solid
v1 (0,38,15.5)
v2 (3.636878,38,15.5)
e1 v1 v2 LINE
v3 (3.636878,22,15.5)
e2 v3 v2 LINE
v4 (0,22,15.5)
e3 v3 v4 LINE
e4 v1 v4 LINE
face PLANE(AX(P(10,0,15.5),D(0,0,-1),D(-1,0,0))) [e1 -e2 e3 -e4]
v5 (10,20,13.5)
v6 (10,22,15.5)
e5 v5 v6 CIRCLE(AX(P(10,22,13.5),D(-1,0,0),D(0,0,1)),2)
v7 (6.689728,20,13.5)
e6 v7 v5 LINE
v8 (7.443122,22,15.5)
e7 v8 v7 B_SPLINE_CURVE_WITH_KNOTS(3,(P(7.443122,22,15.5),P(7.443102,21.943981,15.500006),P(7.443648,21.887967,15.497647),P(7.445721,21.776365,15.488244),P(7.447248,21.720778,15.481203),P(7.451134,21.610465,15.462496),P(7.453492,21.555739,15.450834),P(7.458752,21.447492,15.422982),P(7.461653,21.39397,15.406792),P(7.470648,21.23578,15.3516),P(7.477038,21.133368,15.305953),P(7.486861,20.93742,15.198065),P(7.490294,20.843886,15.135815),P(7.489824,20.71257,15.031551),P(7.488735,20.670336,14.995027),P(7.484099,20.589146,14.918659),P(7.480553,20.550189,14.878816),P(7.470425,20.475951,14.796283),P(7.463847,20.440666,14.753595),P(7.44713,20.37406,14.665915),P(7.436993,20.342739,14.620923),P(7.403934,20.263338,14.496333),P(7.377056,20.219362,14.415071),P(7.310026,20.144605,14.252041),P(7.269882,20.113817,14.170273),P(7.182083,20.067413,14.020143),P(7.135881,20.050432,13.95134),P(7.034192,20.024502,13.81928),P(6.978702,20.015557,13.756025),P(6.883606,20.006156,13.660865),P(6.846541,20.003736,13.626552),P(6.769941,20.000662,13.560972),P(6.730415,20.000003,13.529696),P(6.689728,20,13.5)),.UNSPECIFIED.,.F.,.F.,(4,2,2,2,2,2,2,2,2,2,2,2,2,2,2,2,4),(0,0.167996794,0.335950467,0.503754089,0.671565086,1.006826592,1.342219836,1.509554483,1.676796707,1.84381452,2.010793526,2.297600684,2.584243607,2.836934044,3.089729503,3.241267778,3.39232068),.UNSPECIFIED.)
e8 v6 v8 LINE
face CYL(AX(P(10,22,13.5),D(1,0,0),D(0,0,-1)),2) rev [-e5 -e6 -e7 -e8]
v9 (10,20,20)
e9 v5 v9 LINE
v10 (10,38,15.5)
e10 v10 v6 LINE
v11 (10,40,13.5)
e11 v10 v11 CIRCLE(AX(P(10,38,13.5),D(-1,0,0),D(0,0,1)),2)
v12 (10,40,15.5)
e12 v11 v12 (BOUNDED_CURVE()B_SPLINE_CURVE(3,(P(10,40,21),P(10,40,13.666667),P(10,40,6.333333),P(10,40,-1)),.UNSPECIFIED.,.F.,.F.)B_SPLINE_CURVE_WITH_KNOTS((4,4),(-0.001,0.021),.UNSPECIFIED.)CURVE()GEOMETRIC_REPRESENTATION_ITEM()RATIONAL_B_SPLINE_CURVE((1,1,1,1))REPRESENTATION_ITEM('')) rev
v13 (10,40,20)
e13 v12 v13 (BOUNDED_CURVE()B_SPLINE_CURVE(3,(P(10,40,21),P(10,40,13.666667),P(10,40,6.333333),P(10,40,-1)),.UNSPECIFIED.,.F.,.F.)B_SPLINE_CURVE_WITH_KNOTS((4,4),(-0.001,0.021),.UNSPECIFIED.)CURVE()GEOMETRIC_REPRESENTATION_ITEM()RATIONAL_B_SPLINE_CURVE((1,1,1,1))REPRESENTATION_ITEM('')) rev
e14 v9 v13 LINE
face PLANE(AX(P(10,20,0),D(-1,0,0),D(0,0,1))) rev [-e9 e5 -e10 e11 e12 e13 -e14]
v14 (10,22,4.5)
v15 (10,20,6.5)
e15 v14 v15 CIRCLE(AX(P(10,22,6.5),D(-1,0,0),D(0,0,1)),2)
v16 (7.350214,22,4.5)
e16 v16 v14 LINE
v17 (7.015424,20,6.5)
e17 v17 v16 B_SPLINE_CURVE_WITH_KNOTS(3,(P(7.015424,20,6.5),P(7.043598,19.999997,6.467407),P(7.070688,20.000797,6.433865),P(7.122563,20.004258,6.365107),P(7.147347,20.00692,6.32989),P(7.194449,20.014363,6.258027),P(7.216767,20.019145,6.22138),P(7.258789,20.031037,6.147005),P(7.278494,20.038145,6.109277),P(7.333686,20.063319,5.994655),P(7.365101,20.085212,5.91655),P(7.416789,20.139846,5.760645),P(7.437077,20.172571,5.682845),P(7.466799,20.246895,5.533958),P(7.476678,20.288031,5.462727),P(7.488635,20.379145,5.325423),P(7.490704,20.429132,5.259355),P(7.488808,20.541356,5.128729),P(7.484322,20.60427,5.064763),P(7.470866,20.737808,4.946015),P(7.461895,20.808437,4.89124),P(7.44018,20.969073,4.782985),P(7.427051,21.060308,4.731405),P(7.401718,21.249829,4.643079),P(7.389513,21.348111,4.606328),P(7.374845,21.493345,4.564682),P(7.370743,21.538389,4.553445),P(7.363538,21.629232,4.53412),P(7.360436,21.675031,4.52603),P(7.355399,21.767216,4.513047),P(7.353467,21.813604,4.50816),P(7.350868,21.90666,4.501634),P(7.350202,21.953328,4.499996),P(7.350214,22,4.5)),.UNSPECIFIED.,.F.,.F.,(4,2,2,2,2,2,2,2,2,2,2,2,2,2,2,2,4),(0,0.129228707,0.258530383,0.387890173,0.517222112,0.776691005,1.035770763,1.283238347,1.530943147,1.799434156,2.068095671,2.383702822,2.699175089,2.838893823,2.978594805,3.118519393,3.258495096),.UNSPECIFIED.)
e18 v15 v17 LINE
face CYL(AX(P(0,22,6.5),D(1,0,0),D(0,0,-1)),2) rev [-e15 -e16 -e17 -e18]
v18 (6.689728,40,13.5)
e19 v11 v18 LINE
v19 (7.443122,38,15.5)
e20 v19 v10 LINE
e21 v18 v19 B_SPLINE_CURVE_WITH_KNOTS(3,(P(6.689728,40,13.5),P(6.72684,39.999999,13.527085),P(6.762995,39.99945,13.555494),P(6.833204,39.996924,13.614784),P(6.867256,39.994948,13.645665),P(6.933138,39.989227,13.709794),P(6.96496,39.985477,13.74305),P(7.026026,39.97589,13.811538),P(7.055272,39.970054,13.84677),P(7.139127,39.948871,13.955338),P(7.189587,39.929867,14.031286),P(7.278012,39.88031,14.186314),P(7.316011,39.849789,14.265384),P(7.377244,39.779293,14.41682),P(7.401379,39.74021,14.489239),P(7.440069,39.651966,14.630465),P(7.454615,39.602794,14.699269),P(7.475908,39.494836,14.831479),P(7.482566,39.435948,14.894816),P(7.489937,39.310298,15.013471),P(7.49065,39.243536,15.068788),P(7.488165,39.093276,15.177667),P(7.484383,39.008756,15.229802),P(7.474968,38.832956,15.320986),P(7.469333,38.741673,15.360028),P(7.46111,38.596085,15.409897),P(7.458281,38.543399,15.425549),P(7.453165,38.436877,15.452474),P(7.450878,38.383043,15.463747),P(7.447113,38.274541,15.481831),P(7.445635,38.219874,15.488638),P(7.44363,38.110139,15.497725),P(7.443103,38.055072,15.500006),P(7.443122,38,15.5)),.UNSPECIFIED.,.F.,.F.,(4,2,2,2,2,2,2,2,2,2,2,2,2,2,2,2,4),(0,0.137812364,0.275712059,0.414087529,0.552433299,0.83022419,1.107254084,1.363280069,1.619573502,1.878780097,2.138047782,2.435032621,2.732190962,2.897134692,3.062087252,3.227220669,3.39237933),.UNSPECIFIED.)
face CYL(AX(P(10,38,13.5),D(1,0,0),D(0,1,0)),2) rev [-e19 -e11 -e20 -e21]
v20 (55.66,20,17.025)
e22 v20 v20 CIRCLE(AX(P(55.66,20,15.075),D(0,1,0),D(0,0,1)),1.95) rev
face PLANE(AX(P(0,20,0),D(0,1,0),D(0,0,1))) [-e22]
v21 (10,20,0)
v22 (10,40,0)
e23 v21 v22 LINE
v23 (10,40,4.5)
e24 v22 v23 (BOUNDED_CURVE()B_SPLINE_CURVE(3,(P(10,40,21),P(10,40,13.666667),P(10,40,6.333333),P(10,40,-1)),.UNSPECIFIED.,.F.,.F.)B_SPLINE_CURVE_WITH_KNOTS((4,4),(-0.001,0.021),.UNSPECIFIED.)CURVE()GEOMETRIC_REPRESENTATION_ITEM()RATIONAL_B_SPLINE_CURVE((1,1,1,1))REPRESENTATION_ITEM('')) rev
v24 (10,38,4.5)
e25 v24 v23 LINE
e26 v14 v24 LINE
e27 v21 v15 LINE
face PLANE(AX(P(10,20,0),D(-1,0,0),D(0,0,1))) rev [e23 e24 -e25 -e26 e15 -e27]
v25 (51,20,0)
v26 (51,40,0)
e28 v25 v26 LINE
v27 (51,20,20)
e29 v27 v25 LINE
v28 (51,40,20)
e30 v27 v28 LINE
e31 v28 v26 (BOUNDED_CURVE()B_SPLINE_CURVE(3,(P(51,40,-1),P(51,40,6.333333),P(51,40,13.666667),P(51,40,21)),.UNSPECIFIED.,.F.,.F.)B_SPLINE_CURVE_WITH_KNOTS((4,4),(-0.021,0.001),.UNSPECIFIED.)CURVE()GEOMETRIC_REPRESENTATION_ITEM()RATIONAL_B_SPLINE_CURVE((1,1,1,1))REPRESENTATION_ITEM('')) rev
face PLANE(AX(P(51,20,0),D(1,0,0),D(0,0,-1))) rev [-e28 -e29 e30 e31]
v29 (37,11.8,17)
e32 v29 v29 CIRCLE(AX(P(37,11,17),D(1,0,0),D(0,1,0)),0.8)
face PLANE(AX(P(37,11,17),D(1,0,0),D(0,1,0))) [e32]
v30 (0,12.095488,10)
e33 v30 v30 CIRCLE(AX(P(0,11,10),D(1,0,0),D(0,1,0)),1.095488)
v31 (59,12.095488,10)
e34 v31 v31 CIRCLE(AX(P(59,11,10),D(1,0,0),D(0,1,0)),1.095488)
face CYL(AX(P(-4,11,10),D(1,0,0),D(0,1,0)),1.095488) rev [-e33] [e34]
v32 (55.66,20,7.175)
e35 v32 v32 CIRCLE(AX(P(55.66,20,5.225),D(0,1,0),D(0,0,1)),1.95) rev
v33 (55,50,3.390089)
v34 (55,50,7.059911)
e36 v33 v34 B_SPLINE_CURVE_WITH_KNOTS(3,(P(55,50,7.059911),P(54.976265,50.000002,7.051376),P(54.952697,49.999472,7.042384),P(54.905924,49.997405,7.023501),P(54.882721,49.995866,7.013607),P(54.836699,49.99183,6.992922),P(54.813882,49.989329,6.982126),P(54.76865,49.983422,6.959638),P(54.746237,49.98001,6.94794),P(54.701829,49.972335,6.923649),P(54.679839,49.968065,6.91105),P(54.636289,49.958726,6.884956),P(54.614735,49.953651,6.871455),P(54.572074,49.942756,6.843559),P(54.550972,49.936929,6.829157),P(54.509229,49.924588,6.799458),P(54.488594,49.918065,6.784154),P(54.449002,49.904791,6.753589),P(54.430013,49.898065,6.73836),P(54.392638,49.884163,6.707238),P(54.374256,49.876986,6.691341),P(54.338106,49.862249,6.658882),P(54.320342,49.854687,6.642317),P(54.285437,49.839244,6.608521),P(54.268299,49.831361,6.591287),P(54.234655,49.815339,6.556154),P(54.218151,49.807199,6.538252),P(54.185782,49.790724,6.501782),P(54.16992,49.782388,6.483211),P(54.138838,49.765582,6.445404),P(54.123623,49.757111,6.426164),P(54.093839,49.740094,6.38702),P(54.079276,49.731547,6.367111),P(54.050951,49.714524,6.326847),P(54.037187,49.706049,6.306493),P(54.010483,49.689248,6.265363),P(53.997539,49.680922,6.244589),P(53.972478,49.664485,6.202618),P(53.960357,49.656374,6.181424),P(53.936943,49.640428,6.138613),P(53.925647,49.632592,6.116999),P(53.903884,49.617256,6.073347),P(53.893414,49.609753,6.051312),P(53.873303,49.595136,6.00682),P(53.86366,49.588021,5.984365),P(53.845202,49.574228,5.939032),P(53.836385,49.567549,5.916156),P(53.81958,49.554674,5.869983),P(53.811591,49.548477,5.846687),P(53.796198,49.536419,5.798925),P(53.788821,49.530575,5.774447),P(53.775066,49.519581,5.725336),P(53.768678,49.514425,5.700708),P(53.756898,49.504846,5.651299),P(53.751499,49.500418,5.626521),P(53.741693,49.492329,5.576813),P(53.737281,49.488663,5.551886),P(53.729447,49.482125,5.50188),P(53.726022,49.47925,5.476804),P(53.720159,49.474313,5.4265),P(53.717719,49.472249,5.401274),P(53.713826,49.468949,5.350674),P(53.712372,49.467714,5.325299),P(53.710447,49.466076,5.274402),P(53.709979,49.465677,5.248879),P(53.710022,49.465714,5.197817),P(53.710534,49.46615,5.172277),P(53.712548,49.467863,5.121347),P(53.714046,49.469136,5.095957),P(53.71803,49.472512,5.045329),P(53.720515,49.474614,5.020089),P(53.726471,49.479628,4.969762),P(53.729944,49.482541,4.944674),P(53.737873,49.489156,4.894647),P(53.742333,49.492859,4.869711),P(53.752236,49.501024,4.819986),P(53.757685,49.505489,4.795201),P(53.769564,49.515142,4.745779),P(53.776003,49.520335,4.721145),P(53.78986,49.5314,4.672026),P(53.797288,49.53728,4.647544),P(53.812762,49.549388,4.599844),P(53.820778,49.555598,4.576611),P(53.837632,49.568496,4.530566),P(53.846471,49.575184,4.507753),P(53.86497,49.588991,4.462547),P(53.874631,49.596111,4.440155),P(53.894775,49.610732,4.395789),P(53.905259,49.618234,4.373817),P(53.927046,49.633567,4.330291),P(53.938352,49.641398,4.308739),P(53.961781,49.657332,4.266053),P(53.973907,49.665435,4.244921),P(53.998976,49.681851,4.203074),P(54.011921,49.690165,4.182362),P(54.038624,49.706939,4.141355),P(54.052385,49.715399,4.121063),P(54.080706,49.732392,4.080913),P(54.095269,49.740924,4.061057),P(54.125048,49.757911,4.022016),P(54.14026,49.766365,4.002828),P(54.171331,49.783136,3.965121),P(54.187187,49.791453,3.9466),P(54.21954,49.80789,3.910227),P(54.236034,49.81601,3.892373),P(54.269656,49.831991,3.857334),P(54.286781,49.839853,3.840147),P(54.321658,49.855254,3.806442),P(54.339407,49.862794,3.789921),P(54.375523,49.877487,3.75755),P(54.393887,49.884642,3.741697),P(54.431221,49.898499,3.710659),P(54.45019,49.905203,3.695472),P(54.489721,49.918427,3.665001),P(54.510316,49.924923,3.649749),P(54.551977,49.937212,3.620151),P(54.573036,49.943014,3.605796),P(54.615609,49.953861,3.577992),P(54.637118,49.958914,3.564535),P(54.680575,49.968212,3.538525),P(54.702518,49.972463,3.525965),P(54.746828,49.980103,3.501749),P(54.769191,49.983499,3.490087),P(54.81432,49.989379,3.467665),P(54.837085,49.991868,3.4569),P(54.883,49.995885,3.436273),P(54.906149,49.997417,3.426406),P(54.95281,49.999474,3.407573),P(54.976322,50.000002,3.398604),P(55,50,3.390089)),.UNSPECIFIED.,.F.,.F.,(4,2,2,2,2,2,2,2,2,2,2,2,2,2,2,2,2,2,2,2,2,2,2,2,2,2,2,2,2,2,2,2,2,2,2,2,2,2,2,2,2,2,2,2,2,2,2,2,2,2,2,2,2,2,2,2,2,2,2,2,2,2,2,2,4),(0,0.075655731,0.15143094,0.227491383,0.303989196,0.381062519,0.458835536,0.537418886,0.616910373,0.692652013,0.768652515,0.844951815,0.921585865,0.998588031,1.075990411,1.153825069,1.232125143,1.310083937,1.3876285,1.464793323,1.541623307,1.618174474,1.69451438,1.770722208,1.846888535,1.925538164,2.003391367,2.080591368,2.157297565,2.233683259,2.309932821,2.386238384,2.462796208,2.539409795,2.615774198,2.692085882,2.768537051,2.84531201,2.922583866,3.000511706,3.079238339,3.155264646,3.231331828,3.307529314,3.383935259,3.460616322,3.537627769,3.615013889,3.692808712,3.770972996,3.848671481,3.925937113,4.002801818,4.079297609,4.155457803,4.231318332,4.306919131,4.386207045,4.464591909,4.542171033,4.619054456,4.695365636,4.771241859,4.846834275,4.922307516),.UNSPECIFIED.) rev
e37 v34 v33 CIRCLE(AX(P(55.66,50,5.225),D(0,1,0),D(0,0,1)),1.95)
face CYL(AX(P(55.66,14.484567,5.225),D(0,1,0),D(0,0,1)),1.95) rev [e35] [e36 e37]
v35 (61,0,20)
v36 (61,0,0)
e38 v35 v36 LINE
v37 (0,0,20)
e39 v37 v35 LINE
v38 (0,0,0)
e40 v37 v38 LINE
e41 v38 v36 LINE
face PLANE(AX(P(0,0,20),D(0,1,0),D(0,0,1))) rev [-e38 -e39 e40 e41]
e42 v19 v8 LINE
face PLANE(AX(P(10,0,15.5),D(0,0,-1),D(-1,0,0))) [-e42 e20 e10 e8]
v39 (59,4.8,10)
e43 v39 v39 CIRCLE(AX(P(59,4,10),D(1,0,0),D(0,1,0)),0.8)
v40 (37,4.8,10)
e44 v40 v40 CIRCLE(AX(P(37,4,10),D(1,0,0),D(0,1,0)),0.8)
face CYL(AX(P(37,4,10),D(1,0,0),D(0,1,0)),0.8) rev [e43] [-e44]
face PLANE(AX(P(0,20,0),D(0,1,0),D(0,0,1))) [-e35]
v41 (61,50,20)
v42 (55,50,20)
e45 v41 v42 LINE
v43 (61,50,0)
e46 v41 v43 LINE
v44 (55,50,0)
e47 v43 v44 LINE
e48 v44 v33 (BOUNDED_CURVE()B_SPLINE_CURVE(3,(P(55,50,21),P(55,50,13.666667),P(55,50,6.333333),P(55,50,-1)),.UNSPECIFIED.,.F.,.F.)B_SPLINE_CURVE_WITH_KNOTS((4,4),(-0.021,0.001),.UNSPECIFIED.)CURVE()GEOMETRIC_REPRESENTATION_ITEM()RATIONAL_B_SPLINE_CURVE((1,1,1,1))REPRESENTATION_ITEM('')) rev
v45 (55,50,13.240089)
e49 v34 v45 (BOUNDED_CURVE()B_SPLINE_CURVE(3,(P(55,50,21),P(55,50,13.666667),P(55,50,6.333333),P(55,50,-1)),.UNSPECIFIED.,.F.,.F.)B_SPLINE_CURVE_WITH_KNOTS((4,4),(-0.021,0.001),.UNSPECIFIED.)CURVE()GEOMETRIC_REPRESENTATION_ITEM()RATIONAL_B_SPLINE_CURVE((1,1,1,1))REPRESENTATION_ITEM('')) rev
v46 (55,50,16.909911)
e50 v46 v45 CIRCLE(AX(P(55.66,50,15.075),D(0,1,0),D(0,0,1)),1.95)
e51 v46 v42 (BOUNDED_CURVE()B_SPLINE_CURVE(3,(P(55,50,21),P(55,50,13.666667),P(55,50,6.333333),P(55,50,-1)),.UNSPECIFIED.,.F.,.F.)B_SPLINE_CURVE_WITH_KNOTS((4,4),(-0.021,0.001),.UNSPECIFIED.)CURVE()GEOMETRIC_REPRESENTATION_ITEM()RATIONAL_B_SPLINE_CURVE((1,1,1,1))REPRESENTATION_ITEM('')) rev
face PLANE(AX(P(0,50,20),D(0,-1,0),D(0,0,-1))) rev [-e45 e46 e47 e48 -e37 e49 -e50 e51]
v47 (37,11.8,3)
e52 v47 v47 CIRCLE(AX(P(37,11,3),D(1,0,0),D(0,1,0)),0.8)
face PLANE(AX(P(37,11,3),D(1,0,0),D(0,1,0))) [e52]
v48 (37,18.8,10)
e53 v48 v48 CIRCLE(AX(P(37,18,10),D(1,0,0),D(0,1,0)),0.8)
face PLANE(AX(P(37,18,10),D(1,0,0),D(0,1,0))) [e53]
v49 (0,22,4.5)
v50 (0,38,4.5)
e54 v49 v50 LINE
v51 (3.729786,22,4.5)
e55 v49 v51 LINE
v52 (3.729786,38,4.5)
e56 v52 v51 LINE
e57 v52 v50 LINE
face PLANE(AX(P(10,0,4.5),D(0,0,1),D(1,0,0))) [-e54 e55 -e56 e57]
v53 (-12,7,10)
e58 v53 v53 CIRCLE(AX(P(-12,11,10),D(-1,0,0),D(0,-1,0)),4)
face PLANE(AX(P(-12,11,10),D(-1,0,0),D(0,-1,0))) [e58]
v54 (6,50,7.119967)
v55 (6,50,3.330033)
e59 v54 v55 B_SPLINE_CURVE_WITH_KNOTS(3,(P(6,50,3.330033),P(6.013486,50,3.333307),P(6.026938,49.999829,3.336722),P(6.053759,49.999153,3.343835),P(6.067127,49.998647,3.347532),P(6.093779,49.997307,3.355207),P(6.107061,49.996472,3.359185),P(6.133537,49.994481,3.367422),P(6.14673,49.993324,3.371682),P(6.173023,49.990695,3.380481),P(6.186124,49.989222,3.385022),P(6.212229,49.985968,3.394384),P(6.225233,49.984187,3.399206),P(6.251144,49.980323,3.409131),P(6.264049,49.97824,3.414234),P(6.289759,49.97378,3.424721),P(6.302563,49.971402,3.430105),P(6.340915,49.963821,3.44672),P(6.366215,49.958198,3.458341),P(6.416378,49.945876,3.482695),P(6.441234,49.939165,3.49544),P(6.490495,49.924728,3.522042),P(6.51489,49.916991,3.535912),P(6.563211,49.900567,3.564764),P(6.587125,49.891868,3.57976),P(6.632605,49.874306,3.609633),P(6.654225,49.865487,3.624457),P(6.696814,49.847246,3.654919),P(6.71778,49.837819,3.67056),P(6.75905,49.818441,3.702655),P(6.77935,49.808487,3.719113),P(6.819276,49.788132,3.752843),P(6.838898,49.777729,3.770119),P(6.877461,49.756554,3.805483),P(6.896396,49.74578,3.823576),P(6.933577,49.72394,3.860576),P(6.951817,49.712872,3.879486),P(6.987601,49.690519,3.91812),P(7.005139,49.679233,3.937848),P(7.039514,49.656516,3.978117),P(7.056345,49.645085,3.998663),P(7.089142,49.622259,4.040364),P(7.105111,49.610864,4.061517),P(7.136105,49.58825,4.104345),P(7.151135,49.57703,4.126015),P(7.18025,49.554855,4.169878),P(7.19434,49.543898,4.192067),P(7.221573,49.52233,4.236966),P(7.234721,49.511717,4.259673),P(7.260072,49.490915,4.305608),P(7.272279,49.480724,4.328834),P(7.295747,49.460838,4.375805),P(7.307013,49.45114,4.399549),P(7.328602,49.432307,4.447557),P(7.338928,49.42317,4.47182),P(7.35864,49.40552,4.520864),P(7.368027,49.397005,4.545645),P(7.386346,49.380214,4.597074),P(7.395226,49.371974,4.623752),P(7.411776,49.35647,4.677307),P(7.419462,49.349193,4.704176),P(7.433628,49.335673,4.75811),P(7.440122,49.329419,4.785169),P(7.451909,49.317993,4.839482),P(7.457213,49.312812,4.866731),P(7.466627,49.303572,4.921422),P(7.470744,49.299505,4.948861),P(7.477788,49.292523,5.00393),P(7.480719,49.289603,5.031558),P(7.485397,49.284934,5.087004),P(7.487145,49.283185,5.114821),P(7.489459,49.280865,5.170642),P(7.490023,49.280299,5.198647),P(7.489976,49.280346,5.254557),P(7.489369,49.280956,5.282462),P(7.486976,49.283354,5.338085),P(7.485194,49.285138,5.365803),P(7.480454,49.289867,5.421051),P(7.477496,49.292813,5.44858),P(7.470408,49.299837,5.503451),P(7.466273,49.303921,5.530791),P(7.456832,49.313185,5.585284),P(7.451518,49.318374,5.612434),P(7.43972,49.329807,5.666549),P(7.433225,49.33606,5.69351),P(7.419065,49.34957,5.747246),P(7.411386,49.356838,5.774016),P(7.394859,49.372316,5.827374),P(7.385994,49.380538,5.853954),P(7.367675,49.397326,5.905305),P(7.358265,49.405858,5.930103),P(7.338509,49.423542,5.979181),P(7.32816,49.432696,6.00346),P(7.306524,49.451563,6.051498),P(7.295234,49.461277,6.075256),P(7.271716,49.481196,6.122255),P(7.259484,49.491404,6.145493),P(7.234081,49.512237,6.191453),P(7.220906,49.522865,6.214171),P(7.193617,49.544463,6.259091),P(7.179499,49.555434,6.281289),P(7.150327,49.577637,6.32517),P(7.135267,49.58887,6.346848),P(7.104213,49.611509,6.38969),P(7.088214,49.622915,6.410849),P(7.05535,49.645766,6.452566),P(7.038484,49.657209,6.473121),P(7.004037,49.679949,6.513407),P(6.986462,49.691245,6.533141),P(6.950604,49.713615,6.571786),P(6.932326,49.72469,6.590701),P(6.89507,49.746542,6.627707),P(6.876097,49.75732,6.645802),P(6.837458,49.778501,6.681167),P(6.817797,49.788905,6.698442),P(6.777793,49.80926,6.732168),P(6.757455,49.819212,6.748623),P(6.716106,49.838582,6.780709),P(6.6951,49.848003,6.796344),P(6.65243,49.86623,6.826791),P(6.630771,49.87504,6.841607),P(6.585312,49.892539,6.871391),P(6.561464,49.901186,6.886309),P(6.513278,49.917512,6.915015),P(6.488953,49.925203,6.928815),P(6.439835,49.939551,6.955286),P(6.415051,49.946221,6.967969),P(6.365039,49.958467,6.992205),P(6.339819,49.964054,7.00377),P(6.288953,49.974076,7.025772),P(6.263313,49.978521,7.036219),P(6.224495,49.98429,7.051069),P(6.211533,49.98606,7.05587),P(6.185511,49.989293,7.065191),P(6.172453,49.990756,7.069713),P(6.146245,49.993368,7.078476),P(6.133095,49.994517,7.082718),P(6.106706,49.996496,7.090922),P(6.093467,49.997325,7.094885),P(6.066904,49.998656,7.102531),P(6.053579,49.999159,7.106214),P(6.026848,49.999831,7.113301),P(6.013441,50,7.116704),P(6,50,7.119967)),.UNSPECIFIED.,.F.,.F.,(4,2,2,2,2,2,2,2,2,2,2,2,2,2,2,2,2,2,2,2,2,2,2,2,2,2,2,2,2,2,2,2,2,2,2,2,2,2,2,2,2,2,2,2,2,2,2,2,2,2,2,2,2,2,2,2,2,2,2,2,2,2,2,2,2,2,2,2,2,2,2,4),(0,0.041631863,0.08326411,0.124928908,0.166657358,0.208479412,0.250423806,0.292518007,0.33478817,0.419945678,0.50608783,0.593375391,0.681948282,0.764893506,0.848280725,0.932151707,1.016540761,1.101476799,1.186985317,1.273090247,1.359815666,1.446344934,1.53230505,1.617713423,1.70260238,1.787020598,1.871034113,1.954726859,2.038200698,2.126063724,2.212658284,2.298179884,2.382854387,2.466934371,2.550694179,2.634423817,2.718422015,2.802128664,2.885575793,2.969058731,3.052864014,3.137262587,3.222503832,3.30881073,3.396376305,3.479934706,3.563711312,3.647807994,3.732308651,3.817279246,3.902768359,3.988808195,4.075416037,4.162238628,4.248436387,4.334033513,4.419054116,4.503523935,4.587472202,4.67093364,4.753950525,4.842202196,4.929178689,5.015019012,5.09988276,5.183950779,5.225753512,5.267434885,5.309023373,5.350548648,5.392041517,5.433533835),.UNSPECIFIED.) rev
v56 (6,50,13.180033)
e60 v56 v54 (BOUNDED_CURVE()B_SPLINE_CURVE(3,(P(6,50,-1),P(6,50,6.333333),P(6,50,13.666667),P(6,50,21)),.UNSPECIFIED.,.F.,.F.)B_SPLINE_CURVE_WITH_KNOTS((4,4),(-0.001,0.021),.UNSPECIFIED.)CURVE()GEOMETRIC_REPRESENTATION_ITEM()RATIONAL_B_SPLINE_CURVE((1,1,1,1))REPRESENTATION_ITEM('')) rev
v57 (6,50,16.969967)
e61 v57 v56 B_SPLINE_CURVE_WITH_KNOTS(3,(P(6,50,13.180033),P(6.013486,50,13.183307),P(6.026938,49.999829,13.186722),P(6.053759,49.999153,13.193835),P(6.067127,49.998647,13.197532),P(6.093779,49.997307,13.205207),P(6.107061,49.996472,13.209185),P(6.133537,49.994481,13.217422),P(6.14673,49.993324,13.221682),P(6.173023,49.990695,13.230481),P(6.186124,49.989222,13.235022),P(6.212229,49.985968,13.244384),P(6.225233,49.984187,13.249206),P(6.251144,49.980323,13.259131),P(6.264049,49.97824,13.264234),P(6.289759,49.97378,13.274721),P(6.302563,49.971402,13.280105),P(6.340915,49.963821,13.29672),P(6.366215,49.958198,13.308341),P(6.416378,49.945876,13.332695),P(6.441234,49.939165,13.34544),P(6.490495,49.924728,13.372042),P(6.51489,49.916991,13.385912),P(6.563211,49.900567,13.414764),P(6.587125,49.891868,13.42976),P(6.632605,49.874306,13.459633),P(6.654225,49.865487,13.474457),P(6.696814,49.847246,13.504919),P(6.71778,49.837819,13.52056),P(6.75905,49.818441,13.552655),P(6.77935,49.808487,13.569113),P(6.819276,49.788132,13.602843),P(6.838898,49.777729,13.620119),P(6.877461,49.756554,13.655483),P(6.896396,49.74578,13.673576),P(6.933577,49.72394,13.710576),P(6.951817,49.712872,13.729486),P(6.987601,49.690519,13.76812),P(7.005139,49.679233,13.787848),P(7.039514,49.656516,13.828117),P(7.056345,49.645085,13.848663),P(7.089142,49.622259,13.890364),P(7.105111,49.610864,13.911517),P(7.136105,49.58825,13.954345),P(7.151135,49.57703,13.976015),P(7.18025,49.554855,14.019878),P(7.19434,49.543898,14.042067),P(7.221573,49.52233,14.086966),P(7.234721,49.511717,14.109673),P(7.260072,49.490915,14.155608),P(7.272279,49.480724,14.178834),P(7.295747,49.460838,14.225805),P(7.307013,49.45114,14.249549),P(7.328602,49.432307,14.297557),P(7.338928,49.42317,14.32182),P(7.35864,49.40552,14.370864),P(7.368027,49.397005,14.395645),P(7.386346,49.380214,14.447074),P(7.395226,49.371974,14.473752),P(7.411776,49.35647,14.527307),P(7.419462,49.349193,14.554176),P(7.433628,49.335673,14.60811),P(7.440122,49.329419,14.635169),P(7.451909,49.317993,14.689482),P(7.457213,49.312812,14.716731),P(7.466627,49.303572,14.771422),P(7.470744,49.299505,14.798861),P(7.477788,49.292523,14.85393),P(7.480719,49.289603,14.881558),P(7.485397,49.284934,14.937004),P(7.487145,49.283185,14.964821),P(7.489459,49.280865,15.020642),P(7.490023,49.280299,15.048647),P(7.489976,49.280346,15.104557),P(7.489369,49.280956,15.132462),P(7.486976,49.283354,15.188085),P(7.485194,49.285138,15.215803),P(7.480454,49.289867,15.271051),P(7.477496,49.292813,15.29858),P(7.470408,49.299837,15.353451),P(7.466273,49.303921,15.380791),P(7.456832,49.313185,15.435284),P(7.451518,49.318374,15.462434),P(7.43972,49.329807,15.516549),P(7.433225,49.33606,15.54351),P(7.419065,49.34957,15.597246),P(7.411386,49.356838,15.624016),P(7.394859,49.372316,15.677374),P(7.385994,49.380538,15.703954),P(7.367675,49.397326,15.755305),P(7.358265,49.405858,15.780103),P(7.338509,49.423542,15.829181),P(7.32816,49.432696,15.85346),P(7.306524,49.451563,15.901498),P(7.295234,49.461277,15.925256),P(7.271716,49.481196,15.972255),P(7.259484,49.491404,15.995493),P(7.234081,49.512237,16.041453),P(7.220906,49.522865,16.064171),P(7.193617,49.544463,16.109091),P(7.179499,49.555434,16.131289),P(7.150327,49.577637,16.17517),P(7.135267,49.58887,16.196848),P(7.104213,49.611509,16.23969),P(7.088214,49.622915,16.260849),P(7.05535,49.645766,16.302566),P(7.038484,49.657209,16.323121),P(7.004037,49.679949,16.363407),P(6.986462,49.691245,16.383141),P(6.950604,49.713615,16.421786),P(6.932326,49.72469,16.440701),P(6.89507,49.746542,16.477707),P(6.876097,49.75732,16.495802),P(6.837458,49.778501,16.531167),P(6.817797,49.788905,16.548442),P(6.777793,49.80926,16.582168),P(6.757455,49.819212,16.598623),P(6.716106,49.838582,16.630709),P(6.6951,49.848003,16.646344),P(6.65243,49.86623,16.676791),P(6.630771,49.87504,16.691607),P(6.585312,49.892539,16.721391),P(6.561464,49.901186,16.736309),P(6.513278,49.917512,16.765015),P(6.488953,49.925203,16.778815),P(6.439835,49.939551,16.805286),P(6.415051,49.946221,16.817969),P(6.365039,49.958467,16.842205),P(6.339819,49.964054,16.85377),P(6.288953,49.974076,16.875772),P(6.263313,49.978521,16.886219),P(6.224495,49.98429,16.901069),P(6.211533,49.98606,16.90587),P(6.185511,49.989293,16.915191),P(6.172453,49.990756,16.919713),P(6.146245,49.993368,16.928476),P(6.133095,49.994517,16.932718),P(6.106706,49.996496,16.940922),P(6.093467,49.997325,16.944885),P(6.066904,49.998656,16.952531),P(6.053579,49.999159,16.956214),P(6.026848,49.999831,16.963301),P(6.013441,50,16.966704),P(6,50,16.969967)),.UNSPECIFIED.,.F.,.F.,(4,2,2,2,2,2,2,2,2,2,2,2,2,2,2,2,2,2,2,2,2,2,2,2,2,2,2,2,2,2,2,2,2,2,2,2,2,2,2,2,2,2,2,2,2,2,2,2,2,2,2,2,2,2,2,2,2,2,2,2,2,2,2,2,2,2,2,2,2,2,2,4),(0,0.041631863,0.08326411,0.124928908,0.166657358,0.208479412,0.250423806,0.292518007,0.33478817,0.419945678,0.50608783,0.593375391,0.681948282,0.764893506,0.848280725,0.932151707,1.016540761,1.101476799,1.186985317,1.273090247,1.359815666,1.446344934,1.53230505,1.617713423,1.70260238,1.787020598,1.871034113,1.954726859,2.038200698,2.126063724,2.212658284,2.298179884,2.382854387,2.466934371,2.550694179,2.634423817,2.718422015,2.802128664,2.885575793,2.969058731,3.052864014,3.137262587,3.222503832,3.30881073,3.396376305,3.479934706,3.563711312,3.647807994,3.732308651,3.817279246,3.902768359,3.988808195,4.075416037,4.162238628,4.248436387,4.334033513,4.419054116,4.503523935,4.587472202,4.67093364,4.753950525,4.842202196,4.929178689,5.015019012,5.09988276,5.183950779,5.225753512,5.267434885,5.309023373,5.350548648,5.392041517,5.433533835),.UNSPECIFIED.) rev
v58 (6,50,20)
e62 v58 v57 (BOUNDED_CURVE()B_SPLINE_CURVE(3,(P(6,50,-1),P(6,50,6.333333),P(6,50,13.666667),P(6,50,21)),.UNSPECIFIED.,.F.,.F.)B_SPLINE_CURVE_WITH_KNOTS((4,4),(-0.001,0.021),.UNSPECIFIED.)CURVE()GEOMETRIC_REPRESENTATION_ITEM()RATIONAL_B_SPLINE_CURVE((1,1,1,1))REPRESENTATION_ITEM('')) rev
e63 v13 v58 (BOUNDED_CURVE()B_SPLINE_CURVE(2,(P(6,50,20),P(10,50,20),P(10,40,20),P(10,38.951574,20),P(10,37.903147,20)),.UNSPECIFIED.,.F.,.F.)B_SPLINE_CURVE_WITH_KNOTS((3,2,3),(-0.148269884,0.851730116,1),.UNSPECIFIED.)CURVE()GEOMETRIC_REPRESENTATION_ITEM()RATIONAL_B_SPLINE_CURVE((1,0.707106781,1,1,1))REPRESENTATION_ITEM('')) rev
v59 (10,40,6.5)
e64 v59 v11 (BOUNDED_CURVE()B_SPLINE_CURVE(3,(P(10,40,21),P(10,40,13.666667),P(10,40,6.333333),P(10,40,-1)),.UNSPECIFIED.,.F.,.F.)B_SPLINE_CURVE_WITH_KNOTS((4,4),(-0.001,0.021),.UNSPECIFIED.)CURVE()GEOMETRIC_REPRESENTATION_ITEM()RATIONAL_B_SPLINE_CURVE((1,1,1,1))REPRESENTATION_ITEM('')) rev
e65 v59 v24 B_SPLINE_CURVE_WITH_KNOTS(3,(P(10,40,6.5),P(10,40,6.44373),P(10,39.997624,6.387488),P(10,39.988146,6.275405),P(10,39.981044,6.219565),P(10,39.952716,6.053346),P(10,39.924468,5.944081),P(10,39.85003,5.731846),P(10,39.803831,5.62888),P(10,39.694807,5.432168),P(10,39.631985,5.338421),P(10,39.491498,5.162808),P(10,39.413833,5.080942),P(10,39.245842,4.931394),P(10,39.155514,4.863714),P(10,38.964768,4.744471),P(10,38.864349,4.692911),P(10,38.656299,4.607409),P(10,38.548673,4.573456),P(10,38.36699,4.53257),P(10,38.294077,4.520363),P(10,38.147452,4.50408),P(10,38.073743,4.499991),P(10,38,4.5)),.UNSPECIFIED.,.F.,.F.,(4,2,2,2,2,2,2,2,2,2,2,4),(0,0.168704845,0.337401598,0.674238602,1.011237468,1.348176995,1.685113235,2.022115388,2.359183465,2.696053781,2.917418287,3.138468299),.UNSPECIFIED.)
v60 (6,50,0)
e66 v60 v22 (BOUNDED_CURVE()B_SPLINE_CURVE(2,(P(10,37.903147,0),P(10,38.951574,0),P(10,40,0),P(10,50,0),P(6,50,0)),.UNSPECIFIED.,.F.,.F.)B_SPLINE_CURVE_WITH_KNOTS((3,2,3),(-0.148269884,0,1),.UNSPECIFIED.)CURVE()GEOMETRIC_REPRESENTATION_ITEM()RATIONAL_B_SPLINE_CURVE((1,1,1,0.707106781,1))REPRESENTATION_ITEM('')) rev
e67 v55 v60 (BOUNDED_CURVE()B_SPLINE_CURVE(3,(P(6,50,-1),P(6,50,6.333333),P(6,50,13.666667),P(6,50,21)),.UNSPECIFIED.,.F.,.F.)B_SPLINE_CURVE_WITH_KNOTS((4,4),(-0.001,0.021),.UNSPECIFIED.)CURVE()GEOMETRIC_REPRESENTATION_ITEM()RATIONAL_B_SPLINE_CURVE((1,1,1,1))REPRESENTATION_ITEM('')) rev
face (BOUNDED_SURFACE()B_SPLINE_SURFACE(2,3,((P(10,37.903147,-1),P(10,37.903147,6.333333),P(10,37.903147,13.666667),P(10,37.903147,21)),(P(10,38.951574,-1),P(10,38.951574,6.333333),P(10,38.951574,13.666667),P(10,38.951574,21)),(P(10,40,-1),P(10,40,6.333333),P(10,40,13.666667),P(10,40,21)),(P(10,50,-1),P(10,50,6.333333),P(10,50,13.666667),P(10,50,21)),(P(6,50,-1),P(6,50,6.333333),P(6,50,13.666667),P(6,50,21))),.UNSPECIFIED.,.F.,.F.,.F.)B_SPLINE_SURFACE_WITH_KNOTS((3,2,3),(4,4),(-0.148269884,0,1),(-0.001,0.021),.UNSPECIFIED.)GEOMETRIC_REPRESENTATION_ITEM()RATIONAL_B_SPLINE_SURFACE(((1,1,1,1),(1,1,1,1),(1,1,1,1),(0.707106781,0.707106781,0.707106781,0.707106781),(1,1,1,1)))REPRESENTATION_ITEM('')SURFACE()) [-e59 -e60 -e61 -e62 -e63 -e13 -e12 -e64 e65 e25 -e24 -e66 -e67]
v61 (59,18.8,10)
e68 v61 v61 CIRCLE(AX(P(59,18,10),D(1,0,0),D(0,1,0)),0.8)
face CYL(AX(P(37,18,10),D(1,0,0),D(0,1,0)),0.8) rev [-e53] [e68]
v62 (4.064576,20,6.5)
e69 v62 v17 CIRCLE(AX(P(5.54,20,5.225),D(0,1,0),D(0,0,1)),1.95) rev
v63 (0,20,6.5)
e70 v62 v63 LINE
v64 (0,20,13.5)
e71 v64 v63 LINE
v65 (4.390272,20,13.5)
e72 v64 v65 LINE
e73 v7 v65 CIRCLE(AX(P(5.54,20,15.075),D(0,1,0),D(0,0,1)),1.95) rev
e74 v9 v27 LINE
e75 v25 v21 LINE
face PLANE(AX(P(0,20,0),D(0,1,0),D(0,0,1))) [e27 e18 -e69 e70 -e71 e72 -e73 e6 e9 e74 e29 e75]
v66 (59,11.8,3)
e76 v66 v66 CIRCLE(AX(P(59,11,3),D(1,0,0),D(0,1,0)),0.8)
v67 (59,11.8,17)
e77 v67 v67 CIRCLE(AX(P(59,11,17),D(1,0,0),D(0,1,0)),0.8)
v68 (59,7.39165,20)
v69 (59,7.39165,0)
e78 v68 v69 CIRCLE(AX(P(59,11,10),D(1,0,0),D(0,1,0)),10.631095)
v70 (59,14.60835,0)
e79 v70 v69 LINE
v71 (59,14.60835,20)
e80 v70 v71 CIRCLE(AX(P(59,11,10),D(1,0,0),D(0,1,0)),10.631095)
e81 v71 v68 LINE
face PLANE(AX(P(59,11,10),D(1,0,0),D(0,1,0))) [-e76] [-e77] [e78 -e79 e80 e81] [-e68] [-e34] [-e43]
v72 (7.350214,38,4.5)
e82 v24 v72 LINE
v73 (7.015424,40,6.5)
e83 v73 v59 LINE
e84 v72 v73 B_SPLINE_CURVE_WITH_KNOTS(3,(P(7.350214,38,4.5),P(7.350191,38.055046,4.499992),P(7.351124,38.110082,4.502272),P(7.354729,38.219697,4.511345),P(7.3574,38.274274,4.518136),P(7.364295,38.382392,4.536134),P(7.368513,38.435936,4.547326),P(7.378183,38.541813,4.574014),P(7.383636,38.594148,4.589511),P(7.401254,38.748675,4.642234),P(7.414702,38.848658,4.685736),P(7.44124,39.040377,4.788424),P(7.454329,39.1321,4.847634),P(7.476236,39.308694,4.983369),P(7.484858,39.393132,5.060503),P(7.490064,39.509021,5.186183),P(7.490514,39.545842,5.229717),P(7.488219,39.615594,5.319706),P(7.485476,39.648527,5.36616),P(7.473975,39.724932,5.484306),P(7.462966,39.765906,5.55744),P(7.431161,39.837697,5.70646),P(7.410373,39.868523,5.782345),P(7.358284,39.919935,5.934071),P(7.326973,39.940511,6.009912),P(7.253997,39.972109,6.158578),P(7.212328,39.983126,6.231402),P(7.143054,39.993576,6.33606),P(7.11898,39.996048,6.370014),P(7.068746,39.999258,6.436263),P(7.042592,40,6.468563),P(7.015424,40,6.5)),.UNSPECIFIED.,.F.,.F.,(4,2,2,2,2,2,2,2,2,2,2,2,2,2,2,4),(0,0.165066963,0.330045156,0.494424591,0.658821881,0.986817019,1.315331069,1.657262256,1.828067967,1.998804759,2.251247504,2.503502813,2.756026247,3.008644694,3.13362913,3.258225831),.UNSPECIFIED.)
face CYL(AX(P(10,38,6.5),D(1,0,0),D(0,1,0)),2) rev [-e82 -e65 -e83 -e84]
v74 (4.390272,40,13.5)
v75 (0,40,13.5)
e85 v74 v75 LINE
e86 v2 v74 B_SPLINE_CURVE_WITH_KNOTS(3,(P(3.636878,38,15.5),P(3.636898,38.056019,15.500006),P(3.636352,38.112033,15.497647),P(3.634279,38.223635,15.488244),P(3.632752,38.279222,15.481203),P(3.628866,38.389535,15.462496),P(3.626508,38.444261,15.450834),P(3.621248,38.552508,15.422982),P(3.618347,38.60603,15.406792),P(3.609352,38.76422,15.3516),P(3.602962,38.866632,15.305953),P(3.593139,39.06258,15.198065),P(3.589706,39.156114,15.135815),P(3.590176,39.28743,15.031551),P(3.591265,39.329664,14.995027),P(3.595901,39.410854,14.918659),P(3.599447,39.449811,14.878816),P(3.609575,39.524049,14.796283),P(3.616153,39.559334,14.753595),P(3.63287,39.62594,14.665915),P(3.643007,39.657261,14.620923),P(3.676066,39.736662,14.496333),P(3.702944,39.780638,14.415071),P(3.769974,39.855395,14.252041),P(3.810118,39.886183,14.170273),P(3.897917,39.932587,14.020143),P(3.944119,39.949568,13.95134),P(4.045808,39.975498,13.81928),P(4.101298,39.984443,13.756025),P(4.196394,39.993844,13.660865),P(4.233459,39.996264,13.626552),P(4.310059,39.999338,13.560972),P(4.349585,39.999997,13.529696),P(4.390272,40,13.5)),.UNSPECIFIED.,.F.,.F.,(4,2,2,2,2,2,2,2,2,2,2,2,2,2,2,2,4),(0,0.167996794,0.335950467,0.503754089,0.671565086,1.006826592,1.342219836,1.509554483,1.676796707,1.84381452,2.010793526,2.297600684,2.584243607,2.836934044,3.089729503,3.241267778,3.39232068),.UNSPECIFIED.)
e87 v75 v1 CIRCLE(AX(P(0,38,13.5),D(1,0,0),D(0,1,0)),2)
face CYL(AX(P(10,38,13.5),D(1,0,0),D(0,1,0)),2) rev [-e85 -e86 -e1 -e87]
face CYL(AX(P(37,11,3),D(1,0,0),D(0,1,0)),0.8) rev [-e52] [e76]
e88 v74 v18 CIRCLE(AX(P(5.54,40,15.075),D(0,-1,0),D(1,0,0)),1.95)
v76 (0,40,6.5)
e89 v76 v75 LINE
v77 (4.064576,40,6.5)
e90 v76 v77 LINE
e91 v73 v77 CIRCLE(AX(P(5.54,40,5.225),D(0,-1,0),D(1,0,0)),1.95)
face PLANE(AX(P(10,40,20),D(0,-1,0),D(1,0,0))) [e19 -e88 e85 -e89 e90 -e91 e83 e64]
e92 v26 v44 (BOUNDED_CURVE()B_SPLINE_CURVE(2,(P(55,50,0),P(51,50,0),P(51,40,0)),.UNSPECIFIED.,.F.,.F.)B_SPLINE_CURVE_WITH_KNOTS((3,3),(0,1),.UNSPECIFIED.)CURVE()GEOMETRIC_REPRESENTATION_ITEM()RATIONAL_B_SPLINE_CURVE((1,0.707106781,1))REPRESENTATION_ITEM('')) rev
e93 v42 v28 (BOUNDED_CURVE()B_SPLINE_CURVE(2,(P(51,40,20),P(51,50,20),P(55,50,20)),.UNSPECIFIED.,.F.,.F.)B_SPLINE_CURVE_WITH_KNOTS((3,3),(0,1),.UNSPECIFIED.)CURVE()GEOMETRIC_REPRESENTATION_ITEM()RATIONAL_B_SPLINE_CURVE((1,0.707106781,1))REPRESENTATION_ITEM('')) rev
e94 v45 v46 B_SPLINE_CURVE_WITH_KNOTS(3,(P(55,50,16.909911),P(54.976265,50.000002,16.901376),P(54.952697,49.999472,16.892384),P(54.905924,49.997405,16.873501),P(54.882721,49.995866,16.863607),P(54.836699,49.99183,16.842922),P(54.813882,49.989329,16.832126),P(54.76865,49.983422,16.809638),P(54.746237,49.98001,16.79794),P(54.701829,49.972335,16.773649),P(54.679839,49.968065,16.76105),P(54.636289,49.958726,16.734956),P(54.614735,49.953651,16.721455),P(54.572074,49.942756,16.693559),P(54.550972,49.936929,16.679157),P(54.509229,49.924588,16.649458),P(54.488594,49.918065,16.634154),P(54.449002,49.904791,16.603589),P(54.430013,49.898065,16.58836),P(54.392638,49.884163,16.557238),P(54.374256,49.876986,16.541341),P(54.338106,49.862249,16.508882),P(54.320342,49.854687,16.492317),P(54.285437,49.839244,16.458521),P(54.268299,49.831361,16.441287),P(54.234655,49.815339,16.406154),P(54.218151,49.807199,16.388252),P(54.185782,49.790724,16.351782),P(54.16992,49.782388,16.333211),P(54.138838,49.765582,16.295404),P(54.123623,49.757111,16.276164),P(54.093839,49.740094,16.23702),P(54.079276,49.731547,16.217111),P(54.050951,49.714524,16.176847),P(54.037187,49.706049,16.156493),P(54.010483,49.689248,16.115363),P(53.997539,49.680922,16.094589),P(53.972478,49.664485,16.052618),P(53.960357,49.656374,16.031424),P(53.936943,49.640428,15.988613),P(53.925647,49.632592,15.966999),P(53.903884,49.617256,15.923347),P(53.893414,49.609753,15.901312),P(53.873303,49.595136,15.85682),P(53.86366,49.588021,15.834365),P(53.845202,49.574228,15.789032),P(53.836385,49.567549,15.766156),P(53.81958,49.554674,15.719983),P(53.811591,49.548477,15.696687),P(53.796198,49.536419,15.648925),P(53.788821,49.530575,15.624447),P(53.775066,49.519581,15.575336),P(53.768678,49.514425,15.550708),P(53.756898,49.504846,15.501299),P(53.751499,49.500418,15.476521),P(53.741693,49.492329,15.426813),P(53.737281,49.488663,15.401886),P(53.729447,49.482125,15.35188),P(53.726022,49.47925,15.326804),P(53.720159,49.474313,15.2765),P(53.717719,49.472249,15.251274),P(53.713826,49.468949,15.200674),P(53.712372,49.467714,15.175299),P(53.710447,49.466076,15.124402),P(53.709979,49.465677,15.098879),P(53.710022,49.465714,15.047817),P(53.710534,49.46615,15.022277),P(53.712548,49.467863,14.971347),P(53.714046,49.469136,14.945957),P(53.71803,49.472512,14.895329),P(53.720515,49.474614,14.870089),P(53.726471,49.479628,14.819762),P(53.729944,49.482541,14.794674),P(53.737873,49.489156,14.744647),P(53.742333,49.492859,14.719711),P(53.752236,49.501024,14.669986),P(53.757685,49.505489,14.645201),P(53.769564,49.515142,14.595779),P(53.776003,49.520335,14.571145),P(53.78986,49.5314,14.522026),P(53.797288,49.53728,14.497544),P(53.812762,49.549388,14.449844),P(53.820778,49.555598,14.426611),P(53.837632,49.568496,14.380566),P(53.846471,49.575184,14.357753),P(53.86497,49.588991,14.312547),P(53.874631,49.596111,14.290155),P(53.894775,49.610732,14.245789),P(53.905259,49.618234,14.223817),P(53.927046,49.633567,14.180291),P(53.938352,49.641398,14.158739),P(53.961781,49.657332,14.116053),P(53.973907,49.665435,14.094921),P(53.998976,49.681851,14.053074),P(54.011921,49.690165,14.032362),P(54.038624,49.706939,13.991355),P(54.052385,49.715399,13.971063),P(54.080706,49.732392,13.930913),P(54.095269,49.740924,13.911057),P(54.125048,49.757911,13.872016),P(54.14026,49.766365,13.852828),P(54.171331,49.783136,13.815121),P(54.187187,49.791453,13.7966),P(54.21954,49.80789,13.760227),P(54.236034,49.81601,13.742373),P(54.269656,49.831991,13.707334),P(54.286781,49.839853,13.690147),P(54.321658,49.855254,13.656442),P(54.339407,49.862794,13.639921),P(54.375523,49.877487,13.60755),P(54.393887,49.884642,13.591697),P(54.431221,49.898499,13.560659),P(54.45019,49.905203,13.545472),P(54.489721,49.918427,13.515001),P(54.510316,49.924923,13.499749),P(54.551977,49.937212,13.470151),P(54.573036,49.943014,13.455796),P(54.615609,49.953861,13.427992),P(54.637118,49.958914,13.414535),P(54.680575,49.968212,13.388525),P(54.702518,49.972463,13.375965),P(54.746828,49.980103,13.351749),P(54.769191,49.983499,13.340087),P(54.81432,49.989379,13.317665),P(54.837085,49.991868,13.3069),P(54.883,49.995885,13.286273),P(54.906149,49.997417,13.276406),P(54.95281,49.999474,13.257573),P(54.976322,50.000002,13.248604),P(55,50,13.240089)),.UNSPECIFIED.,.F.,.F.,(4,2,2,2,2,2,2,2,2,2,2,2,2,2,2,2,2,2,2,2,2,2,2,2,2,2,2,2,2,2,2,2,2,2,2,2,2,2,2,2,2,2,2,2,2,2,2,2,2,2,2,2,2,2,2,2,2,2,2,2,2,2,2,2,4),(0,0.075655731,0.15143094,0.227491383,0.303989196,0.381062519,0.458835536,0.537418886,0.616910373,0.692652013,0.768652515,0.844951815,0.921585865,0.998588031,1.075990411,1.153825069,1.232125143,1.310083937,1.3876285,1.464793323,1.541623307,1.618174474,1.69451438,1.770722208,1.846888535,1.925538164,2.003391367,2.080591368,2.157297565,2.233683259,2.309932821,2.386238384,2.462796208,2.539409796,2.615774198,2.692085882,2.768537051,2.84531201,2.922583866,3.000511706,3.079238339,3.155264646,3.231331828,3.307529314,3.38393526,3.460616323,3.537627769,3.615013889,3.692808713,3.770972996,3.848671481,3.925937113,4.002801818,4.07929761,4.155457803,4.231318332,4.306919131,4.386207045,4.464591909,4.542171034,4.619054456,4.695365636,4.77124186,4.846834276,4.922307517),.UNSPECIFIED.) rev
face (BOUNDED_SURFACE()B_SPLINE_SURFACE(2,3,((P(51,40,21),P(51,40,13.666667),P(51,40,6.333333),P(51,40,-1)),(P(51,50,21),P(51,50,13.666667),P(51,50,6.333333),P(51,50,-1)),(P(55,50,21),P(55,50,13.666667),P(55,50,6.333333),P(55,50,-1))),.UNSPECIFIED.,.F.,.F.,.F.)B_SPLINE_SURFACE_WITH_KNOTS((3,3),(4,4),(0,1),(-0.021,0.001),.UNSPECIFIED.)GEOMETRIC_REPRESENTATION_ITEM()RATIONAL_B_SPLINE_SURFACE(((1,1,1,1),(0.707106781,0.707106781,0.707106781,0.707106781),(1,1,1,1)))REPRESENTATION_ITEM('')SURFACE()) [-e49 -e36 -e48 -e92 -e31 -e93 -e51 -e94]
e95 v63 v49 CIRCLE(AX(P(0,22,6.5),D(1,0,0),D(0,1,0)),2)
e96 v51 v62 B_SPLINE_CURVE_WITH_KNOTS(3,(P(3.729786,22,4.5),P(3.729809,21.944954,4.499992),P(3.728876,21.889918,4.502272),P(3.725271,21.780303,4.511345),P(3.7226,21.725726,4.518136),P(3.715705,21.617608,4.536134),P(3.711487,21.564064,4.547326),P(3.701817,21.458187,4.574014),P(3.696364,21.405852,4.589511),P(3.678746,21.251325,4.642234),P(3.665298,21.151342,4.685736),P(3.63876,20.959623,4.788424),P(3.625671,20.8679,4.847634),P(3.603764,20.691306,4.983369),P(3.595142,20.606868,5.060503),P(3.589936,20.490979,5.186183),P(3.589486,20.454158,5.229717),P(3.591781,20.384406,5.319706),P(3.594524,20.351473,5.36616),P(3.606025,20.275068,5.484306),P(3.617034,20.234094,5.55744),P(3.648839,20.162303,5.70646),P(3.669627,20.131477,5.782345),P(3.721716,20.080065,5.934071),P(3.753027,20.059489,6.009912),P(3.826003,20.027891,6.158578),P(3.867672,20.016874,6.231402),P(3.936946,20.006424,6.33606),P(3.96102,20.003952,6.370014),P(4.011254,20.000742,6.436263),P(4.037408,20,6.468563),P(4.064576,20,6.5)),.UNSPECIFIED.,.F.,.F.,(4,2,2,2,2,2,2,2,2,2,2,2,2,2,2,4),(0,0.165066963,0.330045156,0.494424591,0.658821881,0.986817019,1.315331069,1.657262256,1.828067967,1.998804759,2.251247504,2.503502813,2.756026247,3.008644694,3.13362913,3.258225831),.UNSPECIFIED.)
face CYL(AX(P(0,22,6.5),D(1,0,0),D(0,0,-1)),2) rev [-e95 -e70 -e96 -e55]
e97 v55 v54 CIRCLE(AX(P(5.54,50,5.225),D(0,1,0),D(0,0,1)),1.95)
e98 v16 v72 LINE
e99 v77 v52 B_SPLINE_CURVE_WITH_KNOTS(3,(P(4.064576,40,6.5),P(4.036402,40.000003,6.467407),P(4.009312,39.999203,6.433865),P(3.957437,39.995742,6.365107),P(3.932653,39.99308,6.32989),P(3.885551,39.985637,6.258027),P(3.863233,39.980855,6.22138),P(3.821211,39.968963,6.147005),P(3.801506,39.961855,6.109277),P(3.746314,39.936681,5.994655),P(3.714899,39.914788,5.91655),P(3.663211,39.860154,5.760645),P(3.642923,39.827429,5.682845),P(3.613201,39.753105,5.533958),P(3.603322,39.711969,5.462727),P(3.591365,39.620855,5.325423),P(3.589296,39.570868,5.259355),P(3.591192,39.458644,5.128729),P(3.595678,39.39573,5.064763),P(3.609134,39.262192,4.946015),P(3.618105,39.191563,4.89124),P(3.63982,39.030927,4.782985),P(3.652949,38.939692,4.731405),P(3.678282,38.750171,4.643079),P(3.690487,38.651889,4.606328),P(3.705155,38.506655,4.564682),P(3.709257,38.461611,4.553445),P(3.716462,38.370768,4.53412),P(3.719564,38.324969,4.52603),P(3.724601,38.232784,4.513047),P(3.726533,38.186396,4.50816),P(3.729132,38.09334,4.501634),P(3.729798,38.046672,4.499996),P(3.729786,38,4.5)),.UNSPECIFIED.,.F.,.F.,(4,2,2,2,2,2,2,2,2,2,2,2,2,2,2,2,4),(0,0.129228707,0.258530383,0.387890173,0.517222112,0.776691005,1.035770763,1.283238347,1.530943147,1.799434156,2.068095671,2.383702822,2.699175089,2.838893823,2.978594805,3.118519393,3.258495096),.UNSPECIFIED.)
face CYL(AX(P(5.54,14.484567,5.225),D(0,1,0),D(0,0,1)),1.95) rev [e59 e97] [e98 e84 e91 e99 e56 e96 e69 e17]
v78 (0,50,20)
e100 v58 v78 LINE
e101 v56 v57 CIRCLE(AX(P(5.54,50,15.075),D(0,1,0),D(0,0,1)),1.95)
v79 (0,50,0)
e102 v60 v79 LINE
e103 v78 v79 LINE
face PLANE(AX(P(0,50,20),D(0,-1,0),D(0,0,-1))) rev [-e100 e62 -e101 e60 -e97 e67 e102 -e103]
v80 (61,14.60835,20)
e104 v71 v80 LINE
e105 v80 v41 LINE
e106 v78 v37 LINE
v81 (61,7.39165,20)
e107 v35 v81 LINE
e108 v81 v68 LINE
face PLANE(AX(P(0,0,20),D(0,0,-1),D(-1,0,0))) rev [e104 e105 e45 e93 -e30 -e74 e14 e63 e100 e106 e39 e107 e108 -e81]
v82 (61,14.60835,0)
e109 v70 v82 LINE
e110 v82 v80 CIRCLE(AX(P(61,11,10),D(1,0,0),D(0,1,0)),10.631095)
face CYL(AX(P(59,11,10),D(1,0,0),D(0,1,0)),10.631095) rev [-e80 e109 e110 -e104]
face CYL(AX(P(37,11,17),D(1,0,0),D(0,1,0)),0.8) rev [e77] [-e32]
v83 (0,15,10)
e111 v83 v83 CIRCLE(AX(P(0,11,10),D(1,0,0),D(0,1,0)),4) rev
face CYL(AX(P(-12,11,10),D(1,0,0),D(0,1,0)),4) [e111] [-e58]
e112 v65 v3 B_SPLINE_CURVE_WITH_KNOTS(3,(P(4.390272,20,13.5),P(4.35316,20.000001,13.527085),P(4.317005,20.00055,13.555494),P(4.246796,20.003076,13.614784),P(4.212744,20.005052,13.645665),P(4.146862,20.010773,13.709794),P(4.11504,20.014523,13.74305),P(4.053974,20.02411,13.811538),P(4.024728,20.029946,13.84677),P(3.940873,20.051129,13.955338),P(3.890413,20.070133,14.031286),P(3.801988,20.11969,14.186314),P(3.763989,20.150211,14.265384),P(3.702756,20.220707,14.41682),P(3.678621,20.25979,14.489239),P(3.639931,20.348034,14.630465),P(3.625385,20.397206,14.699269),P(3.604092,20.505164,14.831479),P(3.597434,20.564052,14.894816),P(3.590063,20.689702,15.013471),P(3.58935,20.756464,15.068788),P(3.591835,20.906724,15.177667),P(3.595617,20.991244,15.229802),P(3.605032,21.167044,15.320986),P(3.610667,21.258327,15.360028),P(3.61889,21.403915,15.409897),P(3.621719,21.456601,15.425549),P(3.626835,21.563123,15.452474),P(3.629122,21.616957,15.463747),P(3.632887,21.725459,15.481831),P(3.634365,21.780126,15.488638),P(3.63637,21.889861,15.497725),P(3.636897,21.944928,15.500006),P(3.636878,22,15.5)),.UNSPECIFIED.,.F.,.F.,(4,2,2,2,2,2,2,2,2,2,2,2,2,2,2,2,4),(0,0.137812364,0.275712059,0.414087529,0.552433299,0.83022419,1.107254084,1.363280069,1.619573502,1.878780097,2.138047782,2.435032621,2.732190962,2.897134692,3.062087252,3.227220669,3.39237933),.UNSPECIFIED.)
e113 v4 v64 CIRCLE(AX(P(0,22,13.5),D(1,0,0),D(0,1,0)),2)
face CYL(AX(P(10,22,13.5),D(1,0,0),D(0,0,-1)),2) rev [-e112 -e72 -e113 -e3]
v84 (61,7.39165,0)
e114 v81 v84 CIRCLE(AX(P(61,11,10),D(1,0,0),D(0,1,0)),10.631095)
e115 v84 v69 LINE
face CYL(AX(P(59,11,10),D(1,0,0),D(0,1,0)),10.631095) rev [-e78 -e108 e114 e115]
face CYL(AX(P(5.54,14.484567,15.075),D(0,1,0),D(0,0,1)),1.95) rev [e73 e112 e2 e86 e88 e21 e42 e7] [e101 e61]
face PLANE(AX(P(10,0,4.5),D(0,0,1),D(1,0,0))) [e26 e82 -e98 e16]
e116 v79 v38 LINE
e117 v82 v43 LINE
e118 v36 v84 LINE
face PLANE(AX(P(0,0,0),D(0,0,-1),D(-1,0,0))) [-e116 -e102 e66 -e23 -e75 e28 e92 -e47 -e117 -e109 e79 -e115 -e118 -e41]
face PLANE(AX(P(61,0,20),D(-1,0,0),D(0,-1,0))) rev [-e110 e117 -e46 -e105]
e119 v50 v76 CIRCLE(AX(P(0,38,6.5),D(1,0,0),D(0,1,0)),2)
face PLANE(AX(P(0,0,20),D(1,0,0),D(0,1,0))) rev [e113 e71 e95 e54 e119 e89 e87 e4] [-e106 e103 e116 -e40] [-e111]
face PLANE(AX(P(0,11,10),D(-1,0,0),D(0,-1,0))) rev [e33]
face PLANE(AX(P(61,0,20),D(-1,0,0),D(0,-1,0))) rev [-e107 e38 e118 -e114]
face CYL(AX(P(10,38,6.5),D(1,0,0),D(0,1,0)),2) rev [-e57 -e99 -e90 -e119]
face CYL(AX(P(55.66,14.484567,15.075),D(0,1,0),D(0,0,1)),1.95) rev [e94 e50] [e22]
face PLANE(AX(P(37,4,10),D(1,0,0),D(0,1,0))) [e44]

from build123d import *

# Parameters (mm, degrees)
SKIZZE1_W                       = 61
SKIZZE1_H                       = 50
AUFSATZ_LINEAR_AUSTRAGEN1_DEPTH = 20
SKIZZE2_W                       = 41
SKIZZE2_H                       = 20
SCHNITT_LINEAR_AUSTRAGEN1_DEPTH = 30
SCHNITT_LINEAR_START            = -61
SKIZZE3_W                       = 11
SKIZZE3_H                       = 20
SCHNITT_LINEAR_AUSTRAGEN2_DEPTH = 10
SCHNITT_LINEAR_AUSTRAGEN3_REACH = 83.37
SKIZZE4_R                       = 1.95
VERRUNDUNG1_SIZE                = 4
VERRUNDUNG1_SIZE_2              = 10
VERRUNDUNG2_R                   = 2
SKIZZE6_R                       = 10.631095309
SCHNITT_LINEAR_AUSTRAGEN4_DEPTH = 2
SKIZZE7_R                       = 0.8
SCHNITT_LINEAR_AUSTRAGEN5_DEPTH = 22
SKIZZE10_R                      = 1.095488433
SCHNITT_LINEAR_AUSTRAGEN6_DEPTH = 63
SKIZZE11_R                      = 4
AUFSATZ_LINEAR_AUSTRAGEN3_DEPTH = 12


with BuildPart() as part:
    # Skizze1 → Aufsatz-Linear austragen1 (new body)
    with BuildSketch(Plane.XY):
        with Locations((30.5, 25)):
            Rectangle(SKIZZE1_W, SKIZZE1_H)
    extrude(amount=AUFSATZ_LINEAR_AUSTRAGEN1_DEPTH)

    # Skizze2 → Schnitt-Linear austragen1 (cut)
    with BuildSketch(Plane(origin=(0, 50, 0), x_dir=(1, 0, 0), z_dir=(0, 1, 0))):
        with Locations((30.5, -10)):
            Rectangle(SKIZZE2_W, SKIZZE2_H)
    extrude(amount=-SCHNITT_LINEAR_AUSTRAGEN1_DEPTH, mode=Mode.SUBTRACT)

    # Skizze3 → Schnitt-Linear austragen2 (cut)
    with BuildSketch(Plane(origin=(61, 0, 0), x_dir=(0, 0, -1), z_dir=(1, 0, 0)).offset(SCHNITT_LINEAR_START)):
        with Locations((-10, 30)):
            Rectangle(SKIZZE3_W, SKIZZE3_H)
    extrude(amount=SCHNITT_LINEAR_AUSTRAGEN2_DEPTH, mode=Mode.SUBTRACT)

    # Schnitt-Linear austragen3: up to this face of the body (flat: up to its plane)
    schnitt_linear_austragen3_end = Plane(part.part.faces().sort_by_distance((27.483870968, 20, 10))[0])
    # Skizze4 → Schnitt-Linear austragen3 (cut, up to the picked face)
    with BuildSketch(Plane(origin=(0, 50, 0), x_dir=(1, 0, 0), z_dir=(0, 1, 0)), mode=Mode.PRIVATE) as schnitt_linear_austragen3_sk1:
        with Locations(Location((5.54, -5.225, 0), (0, 0, 270))):
            Circle(SKIZZE4_R)
    schnitt_linear_austragen3_tool1 = split(extrude(schnitt_linear_austragen3_sk1.sketch, amount=-SCHNITT_LINEAR_AUSTRAGEN3_REACH, mode=Mode.PRIVATE), bisect_by=schnitt_linear_austragen3_end, keep=Keep.BOTH, mode=Mode.PRIVATE)
    # Skizze4 → Schnitt-Linear austragen3 (cut, up to the picked face)
    with BuildSketch(Plane(origin=(0, 50, 0), x_dir=(1, 0, 0), z_dir=(0, 1, 0)), mode=Mode.PRIVATE) as schnitt_linear_austragen3_sk2:
        with Locations(Location((5.54, -15.075, 0), (0, 0, 270))):
            Circle(SKIZZE4_R)
    schnitt_linear_austragen3_tool2 = split(extrude(schnitt_linear_austragen3_sk2.sketch, amount=-SCHNITT_LINEAR_AUSTRAGEN3_REACH, mode=Mode.PRIVATE), bisect_by=schnitt_linear_austragen3_end, keep=Keep.BOTH, mode=Mode.PRIVATE)
    # Skizze4 → Schnitt-Linear austragen3 (cut, up to the picked face)
    with BuildSketch(Plane(origin=(0, 50, 0), x_dir=(1, 0, 0), z_dir=(0, 1, 0)), mode=Mode.PRIVATE) as schnitt_linear_austragen3_sk3:
        with Locations(Location((55.66, -15.075, 0), (0, 0, 270))):
            Circle(SKIZZE4_R)
    schnitt_linear_austragen3_tool3 = split(extrude(schnitt_linear_austragen3_sk3.sketch, amount=-SCHNITT_LINEAR_AUSTRAGEN3_REACH, mode=Mode.PRIVATE), bisect_by=schnitt_linear_austragen3_end, keep=Keep.BOTH, mode=Mode.PRIVATE)
    # Skizze4 → Schnitt-Linear austragen3 (cut, up to the picked face)
    with BuildSketch(Plane(origin=(0, 50, 0), x_dir=(1, 0, 0), z_dir=(0, 1, 0)), mode=Mode.PRIVATE) as schnitt_linear_austragen3_sk4:
        with Locations(Location((55.66, -5.225, 0), (0, 0, 270))):
            Circle(SKIZZE4_R)
    schnitt_linear_austragen3_tool4 = split(extrude(schnitt_linear_austragen3_sk4.sketch, amount=-SCHNITT_LINEAR_AUSTRAGEN3_REACH, mode=Mode.PRIVATE), bisect_by=schnitt_linear_austragen3_end, keep=Keep.BOTH, mode=Mode.PRIVATE)
    add(schnitt_linear_austragen3_tool1.solids().sort_by(Axis((5.54, 50, 5.225), (0, -1, 0)))[0], mode=Mode.SUBTRACT)
    add(schnitt_linear_austragen3_tool2.solids().sort_by(Axis((5.54, 50, 15.075), (0, -1, 0)))[0], mode=Mode.SUBTRACT)
    add(schnitt_linear_austragen3_tool3.solids().sort_by(Axis((55.66, 50, 15.075), (0, -1, 0)))[0], mode=Mode.SUBTRACT)
    add(schnitt_linear_austragen3_tool4.solids().sort_by(Axis((55.66, 50, 5.225), (0, -1, 0)))[0], mode=Mode.SUBTRACT)

    # Verrundung1
    # an asymmetric fillet: 10, 4 mm, written as the material it takes off along each edge
    with BuildSketch(Plane(origin=(51, 50, -25), x_dir=(1, 0, 0), z_dir=(0, 0, 1)), Plane(origin=(10, 50, 45), x_dir=(-1, 0, 0), z_dir=(0, 0, -1))) as verrundung1_piece_1:
        with BuildLine():
            Bezier((VERRUNDUNG1_SIZE, 0), (0, 0), (0, -VERRUNDUNG1_SIZE_2), weights=[1, 0.707106781, 1])
            Line((0, -VERRUNDUNG1_SIZE_2), (0, 0))
            Line((0, 0), (VERRUNDUNG1_SIZE, 0))
        make_face()
    extrude(amount=70, mode=Mode.SUBTRACT)

    # Verrundung2
    verrundung2_edges = [part.edges().sort_by_distance(p)[0] for p in [
        (1.818438783, 40, 15.5),
        (8.721561217, 40, 15.5),
        (8.675107038, 40, 4.5),
        (1.864892962, 40, 4.5),
        (8.721561217, 20, 15.5),
        (1.818438783, 20, 15.5),
        (8.675107038, 20, 4.5),
        (1.864892962, 20, 4.5),
    ]]
    fillet(verrundung2_edges, radius=VERRUNDUNG2_R)

    # Skizze6 → Schnitt-Linear austragen4 (cut)
    with BuildSketch(Plane(origin=(61, 0, 0), x_dir=(0, 0, -1), z_dir=(1, 0, 0))):
        with Locations((-10, 11)):
            Circle(SKIZZE6_R)
    extrude(amount=-SCHNITT_LINEAR_AUSTRAGEN4_DEPTH, mode=Mode.SUBTRACT)

    # Skizze7 → Schnitt-Linear austragen5 (cut)
    with BuildSketch(Plane(origin=(59, 0, 0), x_dir=(0, 0, -1), z_dir=(1, 0, 0))):
        with Locations(Location((-10, 18, 0), (0, 0, 90))):
            Circle(SKIZZE7_R)
        with Locations(Location((-3, 11, 0), (0, 0, 90))):
            Circle(SKIZZE7_R)
        with Locations(Location((-10, 4, 0), (0, 0, 90))):
            Circle(SKIZZE7_R)
        with Locations(Location((-17, 11, 0), (0, 0, 90))):
            Circle(SKIZZE7_R)
    extrude(amount=-SCHNITT_LINEAR_AUSTRAGEN5_DEPTH, mode=Mode.SUBTRACT)

    # Skizze10 → Schnitt-Linear austragen6 (cut)
    with BuildSketch(Plane(origin=(59, 0, 0), x_dir=(0, 0, -1), z_dir=(1, 0, 0))):
        with Locations(Location((-10, 11, 0), (0, 0, 90))):
            Circle(SKIZZE10_R)
    extrude(amount=-SCHNITT_LINEAR_AUSTRAGEN6_DEPTH, mode=Mode.SUBTRACT)

    # Skizze11 → Aufsatz-Linear austragen3 (add)
    with BuildSketch(Plane.ZY):
        with Locations(Location((10, 11, 0), (0, 0, 90))):
            Circle(SKIZZE11_R)
    extrude(amount=AUFSATZ_LINEAR_AUSTRAGEN3_DEPTH)


solid = part.part
